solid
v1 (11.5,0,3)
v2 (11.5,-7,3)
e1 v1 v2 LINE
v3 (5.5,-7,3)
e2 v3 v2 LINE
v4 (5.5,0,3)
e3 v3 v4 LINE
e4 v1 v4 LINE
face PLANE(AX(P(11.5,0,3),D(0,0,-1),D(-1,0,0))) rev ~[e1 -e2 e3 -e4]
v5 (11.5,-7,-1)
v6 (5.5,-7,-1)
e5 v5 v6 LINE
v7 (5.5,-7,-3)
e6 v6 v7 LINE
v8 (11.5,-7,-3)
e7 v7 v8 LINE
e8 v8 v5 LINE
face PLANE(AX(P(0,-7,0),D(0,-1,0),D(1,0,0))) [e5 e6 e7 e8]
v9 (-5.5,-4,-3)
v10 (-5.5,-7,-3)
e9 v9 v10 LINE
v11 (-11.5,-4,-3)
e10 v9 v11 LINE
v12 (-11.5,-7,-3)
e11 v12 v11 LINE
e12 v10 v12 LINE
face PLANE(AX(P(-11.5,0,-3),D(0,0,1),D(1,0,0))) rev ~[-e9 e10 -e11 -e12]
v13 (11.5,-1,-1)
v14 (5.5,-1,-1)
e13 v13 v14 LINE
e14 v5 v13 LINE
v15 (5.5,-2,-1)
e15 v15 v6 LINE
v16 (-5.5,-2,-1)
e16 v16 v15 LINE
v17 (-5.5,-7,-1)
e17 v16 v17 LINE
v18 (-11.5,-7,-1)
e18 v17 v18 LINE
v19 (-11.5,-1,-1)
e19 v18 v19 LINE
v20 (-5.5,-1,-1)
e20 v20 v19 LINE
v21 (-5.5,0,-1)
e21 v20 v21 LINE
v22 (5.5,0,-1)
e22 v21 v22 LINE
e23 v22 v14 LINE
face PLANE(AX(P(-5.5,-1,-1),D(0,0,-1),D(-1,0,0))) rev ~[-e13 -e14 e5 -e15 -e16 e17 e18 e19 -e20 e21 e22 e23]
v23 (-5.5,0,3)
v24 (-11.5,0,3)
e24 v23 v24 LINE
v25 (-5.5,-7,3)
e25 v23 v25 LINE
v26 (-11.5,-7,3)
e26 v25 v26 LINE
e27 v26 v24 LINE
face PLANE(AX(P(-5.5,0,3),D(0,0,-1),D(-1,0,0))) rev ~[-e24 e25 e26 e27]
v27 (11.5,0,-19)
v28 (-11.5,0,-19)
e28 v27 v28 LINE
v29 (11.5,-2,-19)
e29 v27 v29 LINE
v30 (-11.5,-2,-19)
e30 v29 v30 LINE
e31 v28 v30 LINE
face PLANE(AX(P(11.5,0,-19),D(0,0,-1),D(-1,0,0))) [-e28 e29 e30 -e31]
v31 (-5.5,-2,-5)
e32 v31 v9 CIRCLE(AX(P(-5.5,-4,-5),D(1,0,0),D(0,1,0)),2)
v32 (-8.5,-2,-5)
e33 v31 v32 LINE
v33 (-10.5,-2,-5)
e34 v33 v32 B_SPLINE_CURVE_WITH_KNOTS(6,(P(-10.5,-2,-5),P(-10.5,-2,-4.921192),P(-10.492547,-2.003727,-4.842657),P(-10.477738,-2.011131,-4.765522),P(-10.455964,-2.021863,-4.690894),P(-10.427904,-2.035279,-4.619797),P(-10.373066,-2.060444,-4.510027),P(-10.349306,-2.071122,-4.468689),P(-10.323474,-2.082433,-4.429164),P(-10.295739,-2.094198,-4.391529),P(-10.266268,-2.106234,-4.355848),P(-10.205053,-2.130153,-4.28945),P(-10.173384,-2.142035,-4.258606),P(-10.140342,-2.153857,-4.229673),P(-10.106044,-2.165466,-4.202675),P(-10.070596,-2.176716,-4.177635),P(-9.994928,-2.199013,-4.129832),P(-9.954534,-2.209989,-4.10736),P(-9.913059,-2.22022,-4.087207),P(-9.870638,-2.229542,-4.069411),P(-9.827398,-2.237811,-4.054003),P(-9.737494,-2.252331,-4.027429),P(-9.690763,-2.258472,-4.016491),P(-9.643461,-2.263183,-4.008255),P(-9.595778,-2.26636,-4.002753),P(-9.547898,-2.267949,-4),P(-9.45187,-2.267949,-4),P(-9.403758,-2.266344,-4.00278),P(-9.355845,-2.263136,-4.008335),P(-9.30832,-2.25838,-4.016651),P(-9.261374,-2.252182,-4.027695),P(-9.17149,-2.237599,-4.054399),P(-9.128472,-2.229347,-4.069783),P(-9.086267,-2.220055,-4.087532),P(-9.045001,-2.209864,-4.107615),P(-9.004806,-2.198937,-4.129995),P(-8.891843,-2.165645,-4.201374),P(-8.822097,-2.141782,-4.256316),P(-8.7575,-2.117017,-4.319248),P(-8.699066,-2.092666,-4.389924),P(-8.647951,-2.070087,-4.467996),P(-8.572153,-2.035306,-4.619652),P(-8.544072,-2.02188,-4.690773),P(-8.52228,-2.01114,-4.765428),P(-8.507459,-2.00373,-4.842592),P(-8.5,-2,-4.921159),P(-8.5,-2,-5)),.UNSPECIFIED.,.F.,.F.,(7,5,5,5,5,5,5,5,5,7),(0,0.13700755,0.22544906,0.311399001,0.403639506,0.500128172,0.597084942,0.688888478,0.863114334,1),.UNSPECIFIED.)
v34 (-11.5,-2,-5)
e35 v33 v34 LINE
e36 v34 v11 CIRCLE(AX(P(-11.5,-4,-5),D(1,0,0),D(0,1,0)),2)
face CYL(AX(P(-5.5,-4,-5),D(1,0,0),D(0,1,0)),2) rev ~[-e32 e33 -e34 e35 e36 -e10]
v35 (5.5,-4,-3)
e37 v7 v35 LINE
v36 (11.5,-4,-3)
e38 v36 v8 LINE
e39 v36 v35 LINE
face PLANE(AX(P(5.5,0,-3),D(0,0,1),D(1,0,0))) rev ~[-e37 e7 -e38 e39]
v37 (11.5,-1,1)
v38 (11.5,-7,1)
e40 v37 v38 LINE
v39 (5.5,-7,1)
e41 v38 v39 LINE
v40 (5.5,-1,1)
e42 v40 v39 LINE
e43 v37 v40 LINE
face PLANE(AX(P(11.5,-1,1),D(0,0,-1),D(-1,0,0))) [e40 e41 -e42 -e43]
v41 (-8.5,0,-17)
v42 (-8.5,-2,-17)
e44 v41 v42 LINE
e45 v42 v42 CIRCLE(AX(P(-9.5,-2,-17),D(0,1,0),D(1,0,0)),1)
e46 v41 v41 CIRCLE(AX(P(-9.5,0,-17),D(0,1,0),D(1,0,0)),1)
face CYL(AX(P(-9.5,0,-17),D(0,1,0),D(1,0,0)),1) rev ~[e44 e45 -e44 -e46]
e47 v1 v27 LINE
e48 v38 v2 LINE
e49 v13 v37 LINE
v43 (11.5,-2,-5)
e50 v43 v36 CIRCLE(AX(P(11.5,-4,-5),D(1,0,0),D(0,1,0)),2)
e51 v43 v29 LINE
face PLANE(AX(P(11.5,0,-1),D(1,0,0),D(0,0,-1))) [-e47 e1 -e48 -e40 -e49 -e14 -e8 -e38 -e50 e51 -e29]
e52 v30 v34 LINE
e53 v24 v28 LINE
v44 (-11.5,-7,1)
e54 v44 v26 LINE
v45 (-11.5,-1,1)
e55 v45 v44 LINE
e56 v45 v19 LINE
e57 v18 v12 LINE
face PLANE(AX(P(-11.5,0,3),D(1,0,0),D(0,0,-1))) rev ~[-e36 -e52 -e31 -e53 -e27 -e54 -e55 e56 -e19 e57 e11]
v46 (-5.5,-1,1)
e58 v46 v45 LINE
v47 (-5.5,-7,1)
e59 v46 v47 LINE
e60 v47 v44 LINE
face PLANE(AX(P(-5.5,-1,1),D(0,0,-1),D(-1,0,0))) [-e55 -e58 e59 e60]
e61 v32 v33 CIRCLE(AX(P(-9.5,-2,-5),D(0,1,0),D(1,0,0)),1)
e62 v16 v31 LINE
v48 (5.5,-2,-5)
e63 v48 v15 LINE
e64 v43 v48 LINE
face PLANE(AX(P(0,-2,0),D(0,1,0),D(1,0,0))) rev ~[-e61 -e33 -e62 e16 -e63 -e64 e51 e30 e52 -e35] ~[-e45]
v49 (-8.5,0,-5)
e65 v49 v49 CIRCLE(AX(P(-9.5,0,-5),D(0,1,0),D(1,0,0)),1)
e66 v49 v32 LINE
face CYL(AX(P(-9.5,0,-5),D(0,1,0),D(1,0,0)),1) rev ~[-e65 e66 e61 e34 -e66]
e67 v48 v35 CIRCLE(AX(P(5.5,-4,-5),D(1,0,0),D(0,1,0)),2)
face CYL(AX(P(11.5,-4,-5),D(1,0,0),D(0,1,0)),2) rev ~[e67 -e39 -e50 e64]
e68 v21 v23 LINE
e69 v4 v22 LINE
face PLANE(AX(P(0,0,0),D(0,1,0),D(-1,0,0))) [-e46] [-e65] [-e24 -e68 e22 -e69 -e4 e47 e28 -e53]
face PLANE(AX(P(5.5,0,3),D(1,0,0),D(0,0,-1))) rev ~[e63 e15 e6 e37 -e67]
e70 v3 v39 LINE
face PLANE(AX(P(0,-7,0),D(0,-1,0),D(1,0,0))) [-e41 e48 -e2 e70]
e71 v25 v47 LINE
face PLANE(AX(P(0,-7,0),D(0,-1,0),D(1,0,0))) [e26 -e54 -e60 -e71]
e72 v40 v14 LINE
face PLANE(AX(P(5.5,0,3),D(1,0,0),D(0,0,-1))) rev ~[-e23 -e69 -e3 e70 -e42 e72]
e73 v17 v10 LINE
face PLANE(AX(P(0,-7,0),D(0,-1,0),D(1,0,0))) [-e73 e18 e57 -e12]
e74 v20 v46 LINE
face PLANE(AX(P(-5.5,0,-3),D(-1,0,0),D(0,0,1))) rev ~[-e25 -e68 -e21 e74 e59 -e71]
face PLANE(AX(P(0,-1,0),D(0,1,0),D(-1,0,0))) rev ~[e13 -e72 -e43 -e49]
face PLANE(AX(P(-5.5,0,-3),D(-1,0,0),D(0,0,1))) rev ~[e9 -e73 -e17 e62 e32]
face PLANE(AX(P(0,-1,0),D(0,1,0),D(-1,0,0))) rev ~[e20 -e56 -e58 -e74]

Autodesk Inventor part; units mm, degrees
ref_plane "YZ Plane" through (0, 0, 0) normal (1, 0, 0) x (0, 1, 0)
ref_plane "XZ Plane" through (0, 0, 0) normal (0, 1, 0) x (-1, 0, 0)
ref_plane "XY Plane" through (0, 0, 0) normal (0, 0, 1) x (1, 0, 0)
sketch "Sketch1" plane through (0, 0, 0) normal (0, 1, 0) x (-1, 0, 0)
  line L0 (-5.5, -3) -> (-11.5, -3)
  line L1 (-11.5, -3) -> (-11.5, 3)
  line L2 (-11.5, 3) -> (-5.5, 3)
  line L3 (-5.5, 3) -> (-5.5, -3)
  line L4 (-5.5, -3) -> (-11.5, 3) construction
  line L5 (-11.5, -3) -> (-5.5, 3) construction
  line L6 (11.5, -3) -> (5.5, -3)
  line L7 (5.5, -3) -> (5.5, 3)
  line L8 (5.5, 3) -> (11.5, 3)
  line L9 (11.5, 3) -> (11.5, -3)
  line L10 (11.5, -3) -> (5.5, 3) construction
  line L11 (5.5, -3) -> (11.5, 3) construction
  point P0 (0, 0)
  point P1 (-8.5, 0)
  point P2 (8.5, 0)
  dimension "d0" = 6
  dimension "d1" = 6
  dimension "d2" = 0
  dimension "d3" = 5.5
  dimension "d4" = 6
  dimension "d5" = 6
  dimension "d7" = 11
extrude "Extrusion1" add sketch "Sketch1" against normal blind 1
sketch "Sketch2" plane through (0, -1, 0) normal (0, -1, 0) x (1, 0, 0)
  line L0 (-5.5, 3) -> (-11.5, 3) projected
  line L1 (-5.5, 3) -> (-5.5, -3) projected
  line L2 (-11.5, 3) -> (-5.5, 3)
  line L3 (-5.5, 3) -> (-5.5, 1)
  line L4 (-5.5, 1) -> (-11.5, 1)
  line L5 (-11.5, 1) -> (-11.5, 3)
  line L6 (-5.5, -3) -> (-11.5, -3) projected
  line L7 (-11.5, -3) -> (-5.5, -3)
  line L8 (-5.5, -3) -> (-5.5, -1)
  line L9 (-5.5, -1) -> (-11.5, -1)
  line L10 (-11.5, -1) -> (-11.5, -3)
  line L11 (5.5, 3) -> (5.5, -3) projected
  line L12 (11.5, -3) -> (11.5, 3) projected
  line L13 (5.5, 3) -> (11.5, 3)
  line L14 (11.5, 3) -> (11.5, 1)
  line L15 (11.5, 1) -> (5.5, 1)
  line L16 (5.5, 1) -> (5.5, 3)
  line L17 (5.5, -3) -> (11.5, -3) projected
  line L18 (5.5, -3) -> (11.5, -3)
  line L19 (11.5, -3) -> (11.5, -1)
  line L20 (11.5, -1) -> (5.5, -1)
  line L21 (5.5, -1) -> (5.5, -3)
  point P0 (0, 0)
  dimension "d10" = 2
  dimension "d11" = 2
extrude "Extrusion2" add sketch "Sketch2" along normal blind 6 contours L1 L4 L5 L0 | L1 L6 L10 L9 | L13 L12 L15 L11 | L20 L12 L17 L11
sketch "Sketch3" plane through (0, 0, 0) normal (0, 1, 0) x (1, 0, 0)
  line L0 (-11.5, 1) -> (-11.5, 3) projected
  line L1 (-11.5, 1) -> (11.5, 1)
  line L2 (11.5, 1) -> (11.5, 19)
  line L3 (11.5, 19) -> (-11.5, 19)
  line L4 (-11.5, 19) -> (-11.5, 1)
  line L5 (-5.5, 3) -> (-11.5, 3) projected
  circle A0 centre (-9.5, 17) radius 1
  circle A1 centre (-9.5, 5) radius 1
  point P0 (0, 0)
  dimension "d14" = 23
  dimension "d15" = 16
  dimension "d16" = 2
  dimension "d17" = 2
  dimension "d18" = 2
  dimension "d19" = 2
  dimension "d20" = 2
  dimension "d21" = 2
extrude "Extrusion3" add sketch "Sketch3" against normal blind 2
fillet "Fillet1" radius 2 2 edges at (-8.5, -2, -3) (8.5, -2, -3)
properties part number "sensor_3DPrint"
